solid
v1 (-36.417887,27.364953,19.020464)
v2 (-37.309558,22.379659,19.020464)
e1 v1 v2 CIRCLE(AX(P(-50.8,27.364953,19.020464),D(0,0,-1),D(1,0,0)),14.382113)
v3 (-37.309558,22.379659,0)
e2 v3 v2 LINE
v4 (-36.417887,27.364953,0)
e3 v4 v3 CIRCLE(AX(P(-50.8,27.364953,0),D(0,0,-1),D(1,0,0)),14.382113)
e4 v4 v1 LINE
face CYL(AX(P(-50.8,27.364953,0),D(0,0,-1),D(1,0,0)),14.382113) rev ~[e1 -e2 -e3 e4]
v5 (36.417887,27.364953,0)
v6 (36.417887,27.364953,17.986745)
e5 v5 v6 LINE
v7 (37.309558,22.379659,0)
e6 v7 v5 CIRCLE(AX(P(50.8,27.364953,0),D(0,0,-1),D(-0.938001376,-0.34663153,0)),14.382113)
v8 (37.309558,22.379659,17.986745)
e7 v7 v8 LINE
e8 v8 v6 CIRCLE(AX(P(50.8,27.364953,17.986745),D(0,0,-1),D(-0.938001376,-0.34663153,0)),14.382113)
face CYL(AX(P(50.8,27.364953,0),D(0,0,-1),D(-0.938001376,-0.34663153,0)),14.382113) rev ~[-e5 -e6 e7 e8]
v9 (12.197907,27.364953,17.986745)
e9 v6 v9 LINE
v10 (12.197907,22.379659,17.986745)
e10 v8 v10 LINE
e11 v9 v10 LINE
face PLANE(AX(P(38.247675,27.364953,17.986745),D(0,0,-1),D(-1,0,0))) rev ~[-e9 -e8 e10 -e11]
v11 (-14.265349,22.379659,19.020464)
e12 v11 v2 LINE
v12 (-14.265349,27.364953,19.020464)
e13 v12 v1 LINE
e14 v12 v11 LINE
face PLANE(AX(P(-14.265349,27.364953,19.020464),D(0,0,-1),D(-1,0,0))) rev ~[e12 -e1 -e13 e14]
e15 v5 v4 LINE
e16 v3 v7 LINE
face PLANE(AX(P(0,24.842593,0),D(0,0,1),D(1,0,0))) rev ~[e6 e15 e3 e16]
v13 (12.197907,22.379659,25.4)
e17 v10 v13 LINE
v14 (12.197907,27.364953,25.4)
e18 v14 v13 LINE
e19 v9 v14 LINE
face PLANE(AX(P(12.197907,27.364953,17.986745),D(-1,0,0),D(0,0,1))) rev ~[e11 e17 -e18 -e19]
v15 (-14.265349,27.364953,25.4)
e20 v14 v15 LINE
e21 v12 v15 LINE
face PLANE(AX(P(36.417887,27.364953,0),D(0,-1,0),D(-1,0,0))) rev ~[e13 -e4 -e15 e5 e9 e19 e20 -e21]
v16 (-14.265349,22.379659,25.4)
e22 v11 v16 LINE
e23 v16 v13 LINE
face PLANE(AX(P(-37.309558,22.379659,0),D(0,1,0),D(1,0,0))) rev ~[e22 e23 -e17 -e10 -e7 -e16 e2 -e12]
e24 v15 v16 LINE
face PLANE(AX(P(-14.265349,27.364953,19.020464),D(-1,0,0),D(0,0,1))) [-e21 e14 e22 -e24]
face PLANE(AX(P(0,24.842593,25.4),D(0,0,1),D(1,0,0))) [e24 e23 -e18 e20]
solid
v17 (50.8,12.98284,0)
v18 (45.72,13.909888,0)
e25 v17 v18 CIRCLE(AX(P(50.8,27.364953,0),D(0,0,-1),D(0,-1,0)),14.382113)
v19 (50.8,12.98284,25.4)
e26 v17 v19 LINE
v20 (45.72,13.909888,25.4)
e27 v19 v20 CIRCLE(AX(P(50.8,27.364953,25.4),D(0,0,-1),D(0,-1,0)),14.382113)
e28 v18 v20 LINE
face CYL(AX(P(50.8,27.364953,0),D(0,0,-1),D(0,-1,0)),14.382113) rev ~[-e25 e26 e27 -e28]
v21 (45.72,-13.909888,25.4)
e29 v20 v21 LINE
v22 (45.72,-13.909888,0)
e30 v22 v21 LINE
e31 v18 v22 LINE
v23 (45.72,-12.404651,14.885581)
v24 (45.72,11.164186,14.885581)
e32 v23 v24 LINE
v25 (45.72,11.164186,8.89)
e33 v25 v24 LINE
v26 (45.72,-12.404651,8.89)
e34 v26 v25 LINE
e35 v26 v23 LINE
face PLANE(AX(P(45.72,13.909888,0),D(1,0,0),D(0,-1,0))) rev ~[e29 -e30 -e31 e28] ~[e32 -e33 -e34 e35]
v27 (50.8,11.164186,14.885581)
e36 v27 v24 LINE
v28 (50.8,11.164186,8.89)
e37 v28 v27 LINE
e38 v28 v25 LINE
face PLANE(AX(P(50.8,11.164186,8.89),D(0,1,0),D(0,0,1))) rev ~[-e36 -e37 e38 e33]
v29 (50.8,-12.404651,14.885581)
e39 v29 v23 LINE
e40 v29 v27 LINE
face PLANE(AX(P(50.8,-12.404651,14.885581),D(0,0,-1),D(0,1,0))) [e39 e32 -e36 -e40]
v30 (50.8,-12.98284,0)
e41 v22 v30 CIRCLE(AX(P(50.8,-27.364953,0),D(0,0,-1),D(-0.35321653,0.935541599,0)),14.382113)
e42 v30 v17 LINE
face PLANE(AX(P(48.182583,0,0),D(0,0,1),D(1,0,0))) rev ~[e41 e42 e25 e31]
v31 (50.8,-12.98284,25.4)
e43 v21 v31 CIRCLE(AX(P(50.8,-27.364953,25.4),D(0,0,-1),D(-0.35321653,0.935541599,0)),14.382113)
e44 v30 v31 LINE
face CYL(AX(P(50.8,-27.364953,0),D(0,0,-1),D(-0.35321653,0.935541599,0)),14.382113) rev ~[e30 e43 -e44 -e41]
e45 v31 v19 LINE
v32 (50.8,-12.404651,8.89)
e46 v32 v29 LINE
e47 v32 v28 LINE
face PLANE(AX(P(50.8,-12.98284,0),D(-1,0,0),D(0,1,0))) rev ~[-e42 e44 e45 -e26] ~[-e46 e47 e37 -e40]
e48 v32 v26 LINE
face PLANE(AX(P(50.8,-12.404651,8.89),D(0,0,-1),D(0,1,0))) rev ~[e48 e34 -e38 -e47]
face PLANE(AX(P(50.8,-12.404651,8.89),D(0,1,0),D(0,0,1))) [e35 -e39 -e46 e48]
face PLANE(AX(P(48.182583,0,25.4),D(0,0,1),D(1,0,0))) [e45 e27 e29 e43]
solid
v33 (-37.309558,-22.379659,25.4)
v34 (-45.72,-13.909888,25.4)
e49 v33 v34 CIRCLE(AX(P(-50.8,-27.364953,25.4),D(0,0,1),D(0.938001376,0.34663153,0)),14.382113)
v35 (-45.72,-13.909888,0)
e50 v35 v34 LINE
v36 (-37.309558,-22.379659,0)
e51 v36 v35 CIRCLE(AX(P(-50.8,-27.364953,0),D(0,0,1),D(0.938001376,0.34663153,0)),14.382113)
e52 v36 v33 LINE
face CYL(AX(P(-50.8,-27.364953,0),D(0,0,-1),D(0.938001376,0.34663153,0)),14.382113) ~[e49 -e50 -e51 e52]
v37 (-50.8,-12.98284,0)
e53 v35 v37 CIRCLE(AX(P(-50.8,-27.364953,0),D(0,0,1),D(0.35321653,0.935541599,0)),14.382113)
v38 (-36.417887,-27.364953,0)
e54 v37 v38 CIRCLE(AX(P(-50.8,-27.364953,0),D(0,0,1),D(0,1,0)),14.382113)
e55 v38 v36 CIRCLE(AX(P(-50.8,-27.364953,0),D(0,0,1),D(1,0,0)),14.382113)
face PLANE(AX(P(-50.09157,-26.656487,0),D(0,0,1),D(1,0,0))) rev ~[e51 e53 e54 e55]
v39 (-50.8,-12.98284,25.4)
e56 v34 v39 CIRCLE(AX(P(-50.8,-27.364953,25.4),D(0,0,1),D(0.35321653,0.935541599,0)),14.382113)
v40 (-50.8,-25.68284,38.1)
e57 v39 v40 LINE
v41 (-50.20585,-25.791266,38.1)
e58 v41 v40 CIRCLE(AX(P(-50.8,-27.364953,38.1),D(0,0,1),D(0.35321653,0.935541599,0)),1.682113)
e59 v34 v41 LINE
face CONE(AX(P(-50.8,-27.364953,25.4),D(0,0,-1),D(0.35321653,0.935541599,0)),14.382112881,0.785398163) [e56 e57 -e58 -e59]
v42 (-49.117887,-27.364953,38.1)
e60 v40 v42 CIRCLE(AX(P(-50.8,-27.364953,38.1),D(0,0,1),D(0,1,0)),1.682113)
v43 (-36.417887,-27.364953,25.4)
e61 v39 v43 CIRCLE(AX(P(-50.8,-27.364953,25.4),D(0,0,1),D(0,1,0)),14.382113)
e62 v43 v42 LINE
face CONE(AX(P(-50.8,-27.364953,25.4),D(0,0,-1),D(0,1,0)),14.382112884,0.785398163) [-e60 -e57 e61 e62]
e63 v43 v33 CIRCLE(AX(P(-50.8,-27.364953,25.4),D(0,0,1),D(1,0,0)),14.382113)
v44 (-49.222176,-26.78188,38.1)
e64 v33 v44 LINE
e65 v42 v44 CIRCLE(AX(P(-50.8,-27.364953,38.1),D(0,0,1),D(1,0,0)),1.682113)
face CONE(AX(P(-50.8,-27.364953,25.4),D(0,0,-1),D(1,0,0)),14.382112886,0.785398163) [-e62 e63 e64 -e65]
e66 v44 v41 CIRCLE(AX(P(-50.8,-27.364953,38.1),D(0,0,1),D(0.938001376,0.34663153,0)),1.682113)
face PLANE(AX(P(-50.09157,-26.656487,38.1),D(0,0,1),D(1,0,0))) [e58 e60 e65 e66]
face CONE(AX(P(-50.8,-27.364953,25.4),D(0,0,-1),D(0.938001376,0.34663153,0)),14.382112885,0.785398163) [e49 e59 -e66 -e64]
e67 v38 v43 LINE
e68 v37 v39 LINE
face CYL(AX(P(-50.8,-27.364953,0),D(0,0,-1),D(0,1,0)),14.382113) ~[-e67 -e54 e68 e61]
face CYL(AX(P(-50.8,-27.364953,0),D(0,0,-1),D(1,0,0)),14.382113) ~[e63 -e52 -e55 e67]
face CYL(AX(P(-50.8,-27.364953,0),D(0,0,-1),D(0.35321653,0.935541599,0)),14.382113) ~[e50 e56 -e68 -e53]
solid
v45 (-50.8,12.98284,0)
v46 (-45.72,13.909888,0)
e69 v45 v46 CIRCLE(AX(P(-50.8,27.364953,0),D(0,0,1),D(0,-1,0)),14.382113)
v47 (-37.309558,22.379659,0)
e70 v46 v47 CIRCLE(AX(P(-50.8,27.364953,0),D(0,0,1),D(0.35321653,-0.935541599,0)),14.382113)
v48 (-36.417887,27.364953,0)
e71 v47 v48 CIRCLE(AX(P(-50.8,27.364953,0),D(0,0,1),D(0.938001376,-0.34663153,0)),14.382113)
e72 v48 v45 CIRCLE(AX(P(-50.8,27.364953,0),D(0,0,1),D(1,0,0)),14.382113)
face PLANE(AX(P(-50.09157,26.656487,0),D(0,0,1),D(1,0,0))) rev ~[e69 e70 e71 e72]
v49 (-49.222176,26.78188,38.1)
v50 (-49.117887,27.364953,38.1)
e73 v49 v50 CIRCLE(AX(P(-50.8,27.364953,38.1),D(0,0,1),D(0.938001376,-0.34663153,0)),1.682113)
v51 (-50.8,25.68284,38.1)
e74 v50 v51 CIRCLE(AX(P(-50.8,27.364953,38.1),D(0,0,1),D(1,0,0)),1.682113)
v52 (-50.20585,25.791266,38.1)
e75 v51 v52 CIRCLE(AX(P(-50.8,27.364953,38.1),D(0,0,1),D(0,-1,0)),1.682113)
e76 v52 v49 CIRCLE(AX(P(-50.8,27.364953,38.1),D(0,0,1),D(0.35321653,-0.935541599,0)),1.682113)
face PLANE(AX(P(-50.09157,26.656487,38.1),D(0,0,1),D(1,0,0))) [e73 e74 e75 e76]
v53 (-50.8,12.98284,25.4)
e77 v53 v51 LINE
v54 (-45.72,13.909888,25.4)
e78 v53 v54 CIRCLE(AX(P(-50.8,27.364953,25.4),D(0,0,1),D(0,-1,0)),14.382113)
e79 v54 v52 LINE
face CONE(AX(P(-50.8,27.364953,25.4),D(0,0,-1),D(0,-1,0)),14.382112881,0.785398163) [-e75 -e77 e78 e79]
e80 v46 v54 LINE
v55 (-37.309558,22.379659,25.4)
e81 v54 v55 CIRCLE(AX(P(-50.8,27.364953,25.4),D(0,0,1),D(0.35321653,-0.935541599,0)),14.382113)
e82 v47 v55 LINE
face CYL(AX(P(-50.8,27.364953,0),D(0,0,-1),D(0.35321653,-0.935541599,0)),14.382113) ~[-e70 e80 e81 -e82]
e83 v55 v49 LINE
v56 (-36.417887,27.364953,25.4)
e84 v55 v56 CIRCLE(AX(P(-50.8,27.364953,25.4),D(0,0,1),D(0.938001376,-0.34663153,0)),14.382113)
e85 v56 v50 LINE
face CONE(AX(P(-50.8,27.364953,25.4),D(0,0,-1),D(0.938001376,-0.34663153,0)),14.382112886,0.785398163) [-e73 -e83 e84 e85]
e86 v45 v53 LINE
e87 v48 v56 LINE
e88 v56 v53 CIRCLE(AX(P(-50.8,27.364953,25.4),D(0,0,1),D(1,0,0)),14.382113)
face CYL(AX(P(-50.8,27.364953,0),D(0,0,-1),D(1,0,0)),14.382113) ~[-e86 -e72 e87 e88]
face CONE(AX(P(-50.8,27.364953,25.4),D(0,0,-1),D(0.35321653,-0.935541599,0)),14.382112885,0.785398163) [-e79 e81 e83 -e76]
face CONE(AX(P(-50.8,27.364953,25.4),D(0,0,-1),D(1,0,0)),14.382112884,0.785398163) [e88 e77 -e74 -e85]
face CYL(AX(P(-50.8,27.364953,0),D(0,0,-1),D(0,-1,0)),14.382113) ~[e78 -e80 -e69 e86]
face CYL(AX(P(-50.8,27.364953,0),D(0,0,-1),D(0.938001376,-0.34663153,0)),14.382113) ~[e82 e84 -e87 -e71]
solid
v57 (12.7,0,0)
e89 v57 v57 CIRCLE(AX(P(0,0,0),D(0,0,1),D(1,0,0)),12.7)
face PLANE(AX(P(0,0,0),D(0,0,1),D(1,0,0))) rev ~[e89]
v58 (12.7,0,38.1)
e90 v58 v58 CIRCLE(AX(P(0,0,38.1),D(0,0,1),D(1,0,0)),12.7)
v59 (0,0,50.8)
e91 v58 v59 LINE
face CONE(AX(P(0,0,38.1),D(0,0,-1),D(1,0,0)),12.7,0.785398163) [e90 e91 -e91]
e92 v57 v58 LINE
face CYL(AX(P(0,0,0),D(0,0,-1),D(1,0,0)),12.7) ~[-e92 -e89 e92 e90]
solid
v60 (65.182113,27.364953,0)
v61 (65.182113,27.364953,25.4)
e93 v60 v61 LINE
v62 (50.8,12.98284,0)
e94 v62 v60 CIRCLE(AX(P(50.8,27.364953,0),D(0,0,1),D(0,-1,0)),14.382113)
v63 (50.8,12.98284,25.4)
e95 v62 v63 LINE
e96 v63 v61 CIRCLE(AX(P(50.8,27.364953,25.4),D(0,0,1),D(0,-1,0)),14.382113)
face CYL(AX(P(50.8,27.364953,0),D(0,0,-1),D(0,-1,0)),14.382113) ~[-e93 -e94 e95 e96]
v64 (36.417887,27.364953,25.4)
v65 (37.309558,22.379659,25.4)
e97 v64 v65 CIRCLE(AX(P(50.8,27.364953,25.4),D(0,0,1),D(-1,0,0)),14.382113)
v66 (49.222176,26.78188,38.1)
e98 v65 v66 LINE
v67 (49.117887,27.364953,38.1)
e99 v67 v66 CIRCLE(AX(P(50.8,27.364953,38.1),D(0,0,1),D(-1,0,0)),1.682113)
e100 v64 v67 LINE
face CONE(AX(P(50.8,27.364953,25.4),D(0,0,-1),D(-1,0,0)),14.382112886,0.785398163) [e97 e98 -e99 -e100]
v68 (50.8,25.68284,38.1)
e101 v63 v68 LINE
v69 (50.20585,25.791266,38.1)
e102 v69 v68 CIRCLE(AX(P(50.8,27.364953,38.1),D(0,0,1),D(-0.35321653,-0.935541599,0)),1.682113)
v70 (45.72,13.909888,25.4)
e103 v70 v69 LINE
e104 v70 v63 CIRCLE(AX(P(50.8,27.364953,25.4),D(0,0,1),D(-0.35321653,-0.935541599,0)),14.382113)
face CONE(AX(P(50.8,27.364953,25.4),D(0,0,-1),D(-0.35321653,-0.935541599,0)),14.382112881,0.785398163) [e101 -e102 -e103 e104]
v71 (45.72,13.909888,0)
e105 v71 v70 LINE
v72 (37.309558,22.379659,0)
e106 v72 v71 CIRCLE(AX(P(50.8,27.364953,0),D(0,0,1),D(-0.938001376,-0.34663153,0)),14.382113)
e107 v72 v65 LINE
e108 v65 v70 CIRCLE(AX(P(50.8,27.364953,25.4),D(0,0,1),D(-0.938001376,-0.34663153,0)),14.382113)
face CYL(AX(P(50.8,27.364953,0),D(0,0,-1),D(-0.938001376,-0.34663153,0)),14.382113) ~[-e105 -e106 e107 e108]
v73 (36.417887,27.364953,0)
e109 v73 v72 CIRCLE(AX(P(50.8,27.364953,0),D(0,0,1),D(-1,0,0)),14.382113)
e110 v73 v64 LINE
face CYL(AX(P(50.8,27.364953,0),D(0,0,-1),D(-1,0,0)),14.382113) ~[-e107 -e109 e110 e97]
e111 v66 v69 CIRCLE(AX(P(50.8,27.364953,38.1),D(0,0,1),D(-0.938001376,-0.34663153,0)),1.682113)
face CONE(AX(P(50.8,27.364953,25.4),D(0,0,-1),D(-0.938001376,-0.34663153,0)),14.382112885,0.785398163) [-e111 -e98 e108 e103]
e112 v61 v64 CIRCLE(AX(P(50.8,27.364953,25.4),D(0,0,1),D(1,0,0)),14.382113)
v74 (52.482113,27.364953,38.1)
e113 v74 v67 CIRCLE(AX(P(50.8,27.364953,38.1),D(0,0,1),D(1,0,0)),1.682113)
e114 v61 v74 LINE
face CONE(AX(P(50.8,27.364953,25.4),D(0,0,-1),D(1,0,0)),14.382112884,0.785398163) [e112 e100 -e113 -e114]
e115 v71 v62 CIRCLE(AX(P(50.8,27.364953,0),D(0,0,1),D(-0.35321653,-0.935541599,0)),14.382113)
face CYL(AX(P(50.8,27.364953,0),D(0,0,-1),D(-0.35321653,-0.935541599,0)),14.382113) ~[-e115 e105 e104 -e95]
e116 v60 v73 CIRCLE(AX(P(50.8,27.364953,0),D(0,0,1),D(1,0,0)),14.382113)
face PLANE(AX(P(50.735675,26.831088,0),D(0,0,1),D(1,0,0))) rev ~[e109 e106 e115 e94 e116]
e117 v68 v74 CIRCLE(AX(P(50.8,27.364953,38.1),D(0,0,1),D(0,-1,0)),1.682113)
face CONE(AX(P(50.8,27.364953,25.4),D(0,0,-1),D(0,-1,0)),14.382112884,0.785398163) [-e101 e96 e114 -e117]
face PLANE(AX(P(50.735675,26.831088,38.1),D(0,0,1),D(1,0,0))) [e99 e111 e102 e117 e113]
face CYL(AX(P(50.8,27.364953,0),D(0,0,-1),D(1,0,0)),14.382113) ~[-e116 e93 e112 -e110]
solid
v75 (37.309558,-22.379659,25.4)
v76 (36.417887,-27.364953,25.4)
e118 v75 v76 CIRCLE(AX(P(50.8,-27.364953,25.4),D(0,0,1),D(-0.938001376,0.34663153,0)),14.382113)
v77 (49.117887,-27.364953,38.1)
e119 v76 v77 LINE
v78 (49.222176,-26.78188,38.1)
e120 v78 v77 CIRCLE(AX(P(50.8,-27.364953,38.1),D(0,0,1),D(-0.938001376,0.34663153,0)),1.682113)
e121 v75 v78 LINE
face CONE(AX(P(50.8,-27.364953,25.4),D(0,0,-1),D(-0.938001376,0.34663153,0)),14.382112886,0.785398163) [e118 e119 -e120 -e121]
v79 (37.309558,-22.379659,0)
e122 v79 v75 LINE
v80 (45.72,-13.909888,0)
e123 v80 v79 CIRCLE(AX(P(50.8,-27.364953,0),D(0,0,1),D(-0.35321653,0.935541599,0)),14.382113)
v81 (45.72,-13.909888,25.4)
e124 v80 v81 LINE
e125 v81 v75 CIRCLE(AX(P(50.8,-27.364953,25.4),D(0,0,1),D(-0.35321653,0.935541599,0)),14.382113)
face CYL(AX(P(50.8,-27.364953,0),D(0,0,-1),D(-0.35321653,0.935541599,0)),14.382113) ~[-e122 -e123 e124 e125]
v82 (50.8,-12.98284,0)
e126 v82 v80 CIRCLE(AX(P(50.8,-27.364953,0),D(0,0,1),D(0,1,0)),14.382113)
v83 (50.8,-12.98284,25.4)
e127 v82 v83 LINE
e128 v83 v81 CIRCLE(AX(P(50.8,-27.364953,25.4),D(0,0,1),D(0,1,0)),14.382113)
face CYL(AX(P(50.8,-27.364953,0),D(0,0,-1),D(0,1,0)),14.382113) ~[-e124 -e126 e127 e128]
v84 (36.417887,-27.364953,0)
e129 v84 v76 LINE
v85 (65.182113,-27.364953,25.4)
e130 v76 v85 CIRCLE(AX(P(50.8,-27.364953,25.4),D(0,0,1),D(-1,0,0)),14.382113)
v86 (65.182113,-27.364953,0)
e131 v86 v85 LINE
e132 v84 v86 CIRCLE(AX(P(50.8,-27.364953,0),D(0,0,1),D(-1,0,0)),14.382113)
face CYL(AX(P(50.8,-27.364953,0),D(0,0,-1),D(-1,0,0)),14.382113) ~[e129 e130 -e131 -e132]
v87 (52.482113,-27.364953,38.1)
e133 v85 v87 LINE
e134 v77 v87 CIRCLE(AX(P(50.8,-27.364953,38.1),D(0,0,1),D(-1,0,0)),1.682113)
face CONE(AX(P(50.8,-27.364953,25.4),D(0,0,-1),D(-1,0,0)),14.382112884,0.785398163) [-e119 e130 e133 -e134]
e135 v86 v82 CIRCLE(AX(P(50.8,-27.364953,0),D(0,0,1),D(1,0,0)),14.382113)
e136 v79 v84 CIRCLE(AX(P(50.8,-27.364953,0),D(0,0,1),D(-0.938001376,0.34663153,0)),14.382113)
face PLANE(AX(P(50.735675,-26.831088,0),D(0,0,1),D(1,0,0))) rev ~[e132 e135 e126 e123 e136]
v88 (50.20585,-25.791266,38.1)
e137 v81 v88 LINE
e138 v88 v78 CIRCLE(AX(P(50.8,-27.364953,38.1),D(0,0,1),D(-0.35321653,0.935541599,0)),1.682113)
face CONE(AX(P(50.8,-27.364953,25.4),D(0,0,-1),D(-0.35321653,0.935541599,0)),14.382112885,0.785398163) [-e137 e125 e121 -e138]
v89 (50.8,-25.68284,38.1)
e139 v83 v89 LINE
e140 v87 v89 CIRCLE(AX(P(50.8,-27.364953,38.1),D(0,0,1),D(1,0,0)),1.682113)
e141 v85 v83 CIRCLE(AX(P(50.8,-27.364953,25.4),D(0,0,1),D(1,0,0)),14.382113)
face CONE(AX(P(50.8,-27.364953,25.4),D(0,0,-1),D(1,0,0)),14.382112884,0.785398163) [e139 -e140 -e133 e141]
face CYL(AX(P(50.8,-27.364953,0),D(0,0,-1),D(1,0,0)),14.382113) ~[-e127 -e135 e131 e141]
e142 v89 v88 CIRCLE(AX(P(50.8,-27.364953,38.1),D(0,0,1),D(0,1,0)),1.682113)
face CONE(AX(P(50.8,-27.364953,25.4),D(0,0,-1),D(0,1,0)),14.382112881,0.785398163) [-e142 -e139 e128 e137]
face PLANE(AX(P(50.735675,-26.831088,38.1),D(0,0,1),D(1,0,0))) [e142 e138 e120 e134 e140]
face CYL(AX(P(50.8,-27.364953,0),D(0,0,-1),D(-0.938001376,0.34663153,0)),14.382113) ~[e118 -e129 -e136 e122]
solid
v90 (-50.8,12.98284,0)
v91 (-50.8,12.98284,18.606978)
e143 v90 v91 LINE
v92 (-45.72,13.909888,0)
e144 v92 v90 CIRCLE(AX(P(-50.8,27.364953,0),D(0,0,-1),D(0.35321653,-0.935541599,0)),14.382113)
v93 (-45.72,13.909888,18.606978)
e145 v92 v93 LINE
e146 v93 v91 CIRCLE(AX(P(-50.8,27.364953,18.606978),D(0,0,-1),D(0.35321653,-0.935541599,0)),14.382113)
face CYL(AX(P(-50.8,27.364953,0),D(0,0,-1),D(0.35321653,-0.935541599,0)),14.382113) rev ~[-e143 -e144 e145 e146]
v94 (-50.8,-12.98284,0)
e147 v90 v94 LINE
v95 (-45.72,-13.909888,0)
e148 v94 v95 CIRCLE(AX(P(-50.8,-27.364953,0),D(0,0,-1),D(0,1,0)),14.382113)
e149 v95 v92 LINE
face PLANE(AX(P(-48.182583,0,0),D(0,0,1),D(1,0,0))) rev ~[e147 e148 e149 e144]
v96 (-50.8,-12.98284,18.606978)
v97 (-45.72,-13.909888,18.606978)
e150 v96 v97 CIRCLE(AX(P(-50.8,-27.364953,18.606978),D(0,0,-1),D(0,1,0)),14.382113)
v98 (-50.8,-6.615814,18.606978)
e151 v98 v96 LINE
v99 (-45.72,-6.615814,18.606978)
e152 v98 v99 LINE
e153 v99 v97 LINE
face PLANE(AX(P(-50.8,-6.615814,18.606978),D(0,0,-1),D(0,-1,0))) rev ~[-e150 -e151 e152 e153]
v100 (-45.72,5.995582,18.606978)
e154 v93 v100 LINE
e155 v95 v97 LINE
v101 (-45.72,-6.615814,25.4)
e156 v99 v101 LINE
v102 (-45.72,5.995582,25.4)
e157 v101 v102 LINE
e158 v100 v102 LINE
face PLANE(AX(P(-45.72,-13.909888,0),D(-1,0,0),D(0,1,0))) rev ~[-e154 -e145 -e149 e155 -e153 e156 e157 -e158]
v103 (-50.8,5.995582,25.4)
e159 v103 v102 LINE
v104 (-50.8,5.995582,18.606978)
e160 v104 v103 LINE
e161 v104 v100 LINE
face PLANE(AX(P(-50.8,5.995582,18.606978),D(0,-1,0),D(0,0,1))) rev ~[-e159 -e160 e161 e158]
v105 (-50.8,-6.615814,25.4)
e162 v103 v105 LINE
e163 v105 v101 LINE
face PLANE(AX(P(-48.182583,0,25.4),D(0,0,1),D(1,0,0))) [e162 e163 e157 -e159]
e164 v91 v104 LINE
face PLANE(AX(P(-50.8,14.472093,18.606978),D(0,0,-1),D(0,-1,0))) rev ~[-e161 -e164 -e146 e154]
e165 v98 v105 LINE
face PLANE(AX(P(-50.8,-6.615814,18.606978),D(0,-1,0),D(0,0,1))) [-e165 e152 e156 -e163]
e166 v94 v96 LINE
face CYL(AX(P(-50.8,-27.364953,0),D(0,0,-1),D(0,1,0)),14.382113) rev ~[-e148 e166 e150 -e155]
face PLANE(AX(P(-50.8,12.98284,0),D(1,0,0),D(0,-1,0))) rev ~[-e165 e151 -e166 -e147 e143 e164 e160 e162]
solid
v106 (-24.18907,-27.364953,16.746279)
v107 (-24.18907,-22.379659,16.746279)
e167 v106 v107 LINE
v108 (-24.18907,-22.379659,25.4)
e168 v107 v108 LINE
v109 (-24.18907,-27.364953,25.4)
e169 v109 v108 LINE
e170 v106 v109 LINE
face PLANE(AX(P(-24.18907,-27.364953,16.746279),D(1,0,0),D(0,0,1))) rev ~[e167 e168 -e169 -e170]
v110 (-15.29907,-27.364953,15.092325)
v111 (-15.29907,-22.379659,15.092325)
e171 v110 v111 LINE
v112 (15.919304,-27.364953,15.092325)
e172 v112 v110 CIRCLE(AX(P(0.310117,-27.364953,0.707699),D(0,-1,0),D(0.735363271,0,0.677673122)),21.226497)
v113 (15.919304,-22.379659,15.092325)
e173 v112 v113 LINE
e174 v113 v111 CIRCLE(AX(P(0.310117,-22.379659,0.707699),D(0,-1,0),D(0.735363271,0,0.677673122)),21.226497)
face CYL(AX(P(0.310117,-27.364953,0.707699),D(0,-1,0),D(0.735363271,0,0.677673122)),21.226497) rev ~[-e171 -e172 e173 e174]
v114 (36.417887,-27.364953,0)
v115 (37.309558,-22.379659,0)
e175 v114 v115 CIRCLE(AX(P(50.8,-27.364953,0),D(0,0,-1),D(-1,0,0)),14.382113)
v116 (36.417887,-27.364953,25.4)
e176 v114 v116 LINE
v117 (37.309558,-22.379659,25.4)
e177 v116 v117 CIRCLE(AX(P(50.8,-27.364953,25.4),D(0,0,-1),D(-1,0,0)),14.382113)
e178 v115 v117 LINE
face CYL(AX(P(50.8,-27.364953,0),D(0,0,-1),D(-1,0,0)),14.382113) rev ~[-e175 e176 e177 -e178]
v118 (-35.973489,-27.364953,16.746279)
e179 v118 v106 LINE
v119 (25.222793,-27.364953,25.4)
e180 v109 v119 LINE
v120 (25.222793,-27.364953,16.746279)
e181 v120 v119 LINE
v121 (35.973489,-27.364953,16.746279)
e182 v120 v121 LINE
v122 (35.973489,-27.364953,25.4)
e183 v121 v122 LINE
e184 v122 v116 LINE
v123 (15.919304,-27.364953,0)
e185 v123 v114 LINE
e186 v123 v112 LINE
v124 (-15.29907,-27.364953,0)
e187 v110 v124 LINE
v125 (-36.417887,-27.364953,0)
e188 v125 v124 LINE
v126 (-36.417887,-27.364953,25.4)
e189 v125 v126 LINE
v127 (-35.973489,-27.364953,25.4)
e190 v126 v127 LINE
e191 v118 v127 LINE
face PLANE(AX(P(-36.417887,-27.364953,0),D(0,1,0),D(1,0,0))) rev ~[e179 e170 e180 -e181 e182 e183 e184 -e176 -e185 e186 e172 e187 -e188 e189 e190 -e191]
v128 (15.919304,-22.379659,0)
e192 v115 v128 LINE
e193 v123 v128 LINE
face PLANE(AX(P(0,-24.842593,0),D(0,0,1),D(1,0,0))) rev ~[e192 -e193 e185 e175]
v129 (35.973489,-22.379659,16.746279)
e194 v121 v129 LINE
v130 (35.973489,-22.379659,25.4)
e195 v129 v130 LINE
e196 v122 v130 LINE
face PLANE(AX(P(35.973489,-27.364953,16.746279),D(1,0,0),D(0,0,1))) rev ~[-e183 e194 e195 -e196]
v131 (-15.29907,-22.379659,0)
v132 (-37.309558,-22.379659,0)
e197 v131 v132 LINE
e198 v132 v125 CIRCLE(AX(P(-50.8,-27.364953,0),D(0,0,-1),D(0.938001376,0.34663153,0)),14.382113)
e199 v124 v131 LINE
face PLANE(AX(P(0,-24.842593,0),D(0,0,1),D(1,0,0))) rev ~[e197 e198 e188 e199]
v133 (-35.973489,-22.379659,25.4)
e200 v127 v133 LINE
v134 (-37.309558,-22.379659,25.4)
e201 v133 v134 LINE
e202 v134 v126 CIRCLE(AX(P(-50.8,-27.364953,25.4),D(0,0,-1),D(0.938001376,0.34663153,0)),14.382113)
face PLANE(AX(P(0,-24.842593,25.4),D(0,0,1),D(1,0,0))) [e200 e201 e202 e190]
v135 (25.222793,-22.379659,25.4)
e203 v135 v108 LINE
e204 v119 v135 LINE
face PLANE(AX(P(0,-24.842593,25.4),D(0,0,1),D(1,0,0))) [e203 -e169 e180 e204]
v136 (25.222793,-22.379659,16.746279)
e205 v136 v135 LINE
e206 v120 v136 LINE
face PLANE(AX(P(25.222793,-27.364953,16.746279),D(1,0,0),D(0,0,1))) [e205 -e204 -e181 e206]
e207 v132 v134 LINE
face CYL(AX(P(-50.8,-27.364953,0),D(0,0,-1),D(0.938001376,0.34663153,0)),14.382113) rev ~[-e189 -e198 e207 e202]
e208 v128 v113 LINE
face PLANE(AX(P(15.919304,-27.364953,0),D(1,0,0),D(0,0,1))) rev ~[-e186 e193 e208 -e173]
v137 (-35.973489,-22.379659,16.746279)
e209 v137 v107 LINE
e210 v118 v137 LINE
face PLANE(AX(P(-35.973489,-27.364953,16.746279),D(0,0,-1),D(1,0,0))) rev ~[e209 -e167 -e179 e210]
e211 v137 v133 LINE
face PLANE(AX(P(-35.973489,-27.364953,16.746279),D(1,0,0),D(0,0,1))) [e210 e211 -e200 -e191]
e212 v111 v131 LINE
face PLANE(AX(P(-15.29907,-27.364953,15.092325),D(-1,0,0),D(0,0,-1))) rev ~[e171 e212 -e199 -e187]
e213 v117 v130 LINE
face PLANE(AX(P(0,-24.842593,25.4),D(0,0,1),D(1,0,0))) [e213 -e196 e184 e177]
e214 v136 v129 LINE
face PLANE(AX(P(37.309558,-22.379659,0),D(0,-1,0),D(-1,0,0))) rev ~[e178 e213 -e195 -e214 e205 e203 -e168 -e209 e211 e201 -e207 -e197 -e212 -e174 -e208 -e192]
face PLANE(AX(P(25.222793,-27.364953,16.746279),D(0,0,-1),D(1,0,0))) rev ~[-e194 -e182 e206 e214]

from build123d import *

# Parameters (mm, degrees)
F1_DEPTH   = 25.4
F2_DEPTH   = 38.1
F0_R       = 12.7
F3_DEPTH   = 50.8
F5_DEPTH   = 25.4
F4_W       = 11.7844194174
F4_H       = 8.6537211478
F4_W_2     = 10.750696063
F6_DEPTH   = 25.4
F7_W       = 1.4892533321
F7_H       = 6.7930224627
F7_W_2     = 6.9872582432
F7_W_3     = 6.3670262795
F7_W_4     = 2.1094843645
F8_DEPTH   = 25.4
F9_W       = 23.5688369721
F9_H       = 5.9955809265
F10_DEPTH  = 25.4
F11_W      = 1.8297875876
F11_H      = 7.4132553577
F11_W_2    = 24.2199800333
F11_W_3    = 22.1525379812
F11_H_2    = 6.3795357287
F11_W_4    = 3.6904881353
F12_DEPTH  = 25.4
F13_SIZE   = 12.7
F14_SIZE   = 12.7
F14_2_SIZE = 12.7
F14_3_SIZE = 12.7
F14_4_SIZE = 12.7


with BuildPart() as f1:
    # F0 (on Top) → F1 (new body)
    with BuildSketch(Plane.XY):
        with BuildLine():
            ThreePointArc((37.3095583182, 22.3796591884), (36.6425597983, 24.8327488181), (36.417887116, 27.364952985))
            Line((36.417887116, 27.364952985), (-36.417887116, 27.364952985))
            ThreePointArc((-36.417887116, 27.364952985), (-36.6425597983, 24.8327488181), (-37.3095583182, 22.3796591884))
            Line((-37.3095583182, 22.3796591884), (37.3095583182, 22.3796591884))
        make_face()
    extrude(amount=F1_DEPTH)

    # F11 (on face) → F12 (cut)
    with BuildSketch(Plane(origin=(0, 27.364952985, 0), x_dir=(-1, 0, 0), z_dir=(0, 1, 0))):
        with Locations((-37.3327809098, 21.6933723211)):
            Rectangle(F11_W, F11_H)
        with Locations((-24.3078970994, 21.6933723211)):
            Rectangle(F11_W_2, F11_H)
        with Locations((25.3416181254, 22.2102321357)):
            Rectangle(F11_W_3, F11_H_2)
        with Locations((38.2631311837, 22.2102321357)):
            Rectangle(F11_W_4, F11_H_2)
    extrude(amount=-F12_DEPTH, mode=Mode.SUBTRACT)


with BuildPart() as f1b:
    # F0 (on Top) → F1, piece 2 (new body)
    with BuildSketch(Plane.XY):
        with BuildLine():
            ThreePointArc((-45.72, 13.909888102), (-48.2180521889, 13.2165001894), (-50.8, 12.982840101))
            Line((-50.8, 12.982840101), (-50.8, -12.982840101))
            ThreePointArc((-50.8, -12.982840101), (-48.2180521889, -13.2165001894), (-45.72, -13.909888102))
            Line((-45.72, -13.909888102), (-45.72, 13.909888102))
        make_face()
    extrude(amount=F1_DEPTH)

    # F7 (on face) → F8 (cut)
    with BuildSketch(Plane(origin=(-50.8, 0, 0), x_dir=(0, -1, 0), z_dir=(-1, 0, 0))):
        with Locations((-13.7274667671, 22.0034887686)):
            Rectangle(F7_W, F7_H)
        with Locations((-9.4892109794, 22.0034887686)):
            Rectangle(F7_W_2, F7_H)
        with Locations((9.7993269613, 22.0034887686)):
            Rectangle(F7_W_3, F7_H)
        with Locations((14.0375822833, 22.0034887686)):
            Rectangle(F7_W_4, F7_H)
    extrude(amount=-F8_DEPTH, mode=Mode.SUBTRACT)


with BuildPart() as f1c:
    # F0 (on Top) → F1, piece 3 (new body)
    with BuildSketch(Plane.XY):
        with BuildLine():
            Line((50.8, -12.982840101), (50.8, 12.982840101))
            ThreePointArc((50.8, 12.982840101), (48.2180521889, 13.2165001894), (45.72, 13.909888102))
            Line((45.72, 13.909888102), (45.72, -13.909888102))
            ThreePointArc((45.72, -13.909888102), (48.2180521889, -13.2165001894), (50.8, -12.982840101))
        make_face()
    extrude(amount=F1_DEPTH)

    # F9 (on face) → F10 (cut)
    with BuildSketch(Plane.YZ.offset(50.8)):
        with Locations((-0.620232895, 11.8877906352)):
            Rectangle(F9_W, F9_H)
    extrude(amount=-F10_DEPTH, mode=Mode.SUBTRACT)


with BuildPart() as f1d:
    # F0 (on Top) → F1, piece 4 (new body)
    with BuildSketch(Plane.XY):
        with BuildLine():
            ThreePointArc((-37.3095583182, -22.3796591884), (-36.6425597983, -24.8327488181), (-36.417887116, -27.364952985))
            Line((-36.417887116, -27.364952985), (36.417887116, -27.364952985))
            ThreePointArc((36.417887116, -27.364952985), (36.6425597983, -24.8327488181), (37.3095583182, -22.3796591884))
            Line((37.3095583182, -22.3796591884), (-37.3095583182, -22.3796591884))
        make_face()
    extrude(amount=F1_DEPTH)

    # F4 (on face) → F5 (cut)
    with BuildSketch(Plane.XZ.offset(27.364952985)):
        with BuildLine():
            Line((-15.2990696952, 15.0923253968), (-15.2990696952, 0))
            Line((-15.2990696952, 0), (15.9193035215, 0))
            Line((15.9193035215, 0), (15.9193035215, 15.0923253968))
            ThreePointArc((15.9193035215, 15.0923253968), (0.3101169132, 21.9341960604), (-15.2990696952, 15.0923253968))
        make_face()
    extrude(amount=-F5_DEPTH, mode=Mode.SUBTRACT)

    # F4 (on face) → F6 (cut)
    with BuildSketch(Plane.XZ.offset(27.364952985)):
        with Locations((-30.0812795758, 21.0731394261)):
            Rectangle(F4_W, F4_H)
        with Locations((30.598141253, 21.0731394261)):
            Rectangle(F4_W_2, F4_H)
    extrude(amount=-F6_DEPTH, mode=Mode.SUBTRACT)


with BuildPart() as f2:
    # F0 (on Top) → F2 (new body)
    with BuildSketch(Plane.XY):
        with BuildLine():
            ThreePointArc((-37.3095583182, 22.3796591884), (-36.6425597983, 24.8327488181), (-36.417887116, 27.364952985))
            ThreePointArc((-36.417887116, 27.364952985), (-60.969689548, 37.534642533), (-50.8, 12.982840101))
            ThreePointArc((-50.8, 12.982840101), (-48.2180521889, 13.2165001894), (-45.72, 13.909888102))
            ThreePointArc((-45.72, 13.909888102), (-40.5946297653, 17.2310697521), (-37.3095583182, 22.3796591884))
        make_face()
    extrude(amount=F2_DEPTH)

    # F14
    f14_edges = [f2.edges().sort_by_distance(p)[0] for p in [
        (-50.8, 41.747066, 38.1),
    ]]
    chamfer(f14_edges, length=F14_SIZE)


with BuildPart() as f2b:
    # F0 (on Top) → F2, piece 2 (new body)
    with BuildSketch(Plane.XY):
        with BuildLine():
            ThreePointArc((65.182112884, 27.364952985), (50.8, 41.747065869), (36.417887116, 27.364952985))
            ThreePointArc((36.417887116, 27.364952985), (36.6425597983, 24.8327488181), (37.3095583182, 22.3796591884))
            ThreePointArc((37.3095583182, 22.3796591884), (40.5946297653, 17.2310697521), (45.72, 13.909888102))
            ThreePointArc((45.72, 13.909888102), (48.2180521889, 13.2165001894), (50.8, 12.982840101))
            ThreePointArc((50.8, 12.982840101), (60.969689548, 17.195263437), (65.182112884, 27.364952985))
        make_face()
    extrude(amount=F2_DEPTH)

    # F14#2
    f14_2_edges = [f2b.edges().sort_by_distance(p)[0] for p in [
        (65.182113, 27.364953, 38.1),
    ]]
    chamfer(f14_2_edges, length=F14_2_SIZE)


with BuildPart() as f2c:
    # F0 (on Top) → F2, piece 3 (new body)
    with BuildSketch(Plane.XY):
        with BuildLine():
            ThreePointArc((65.182112884, -27.364952985), (60.969689548, -17.195263437), (50.8, -12.982840101))
            ThreePointArc((50.8, -12.982840101), (48.2180521889, -13.2165001894), (45.72, -13.909888102))
            ThreePointArc((45.72, -13.909888102), (40.5946297653, -17.2310697521), (37.3095583182, -22.3796591884))
            ThreePointArc((37.3095583182, -22.3796591884), (36.6425597983, -24.8327488181), (36.417887116, -27.364952985))
            ThreePointArc((36.417887116, -27.364952985), (50.8, -41.747065869), (65.182112884, -27.364952985))
        make_face()
    extrude(amount=F2_DEPTH)

    # F14#3
    f14_3_edges = [f2c.edges().sort_by_distance(p)[0] for p in [
        (36.417887, -27.364953, 38.1),
    ]]
    chamfer(f14_3_edges, length=F14_3_SIZE)


with BuildPart() as f2d:
    # F0 (on Top) → F2, piece 4 (new body)
    with BuildSketch(Plane.XY):
        with BuildLine():
            ThreePointArc((-45.72, -13.909888102), (-48.2180521889, -13.2165001894), (-50.8, -12.982840101))
            ThreePointArc((-50.8, -12.982840101), (-60.969689548, -37.534642533), (-36.417887116, -27.364952985))
            ThreePointArc((-36.417887116, -27.364952985), (-36.6425597983, -24.8327488181), (-37.3095583182, -22.3796591884))
            ThreePointArc((-37.3095583182, -22.3796591884), (-40.5946297653, -17.2310697521), (-45.72, -13.909888102))
        make_face()
    extrude(amount=F2_DEPTH)

    # F14#4
    f14_4_edges = [f2d.edges().sort_by_distance(p)[0] for p in [
        (-65.182113, -27.364953, 38.1),
    ]]
    chamfer(f14_4_edges, length=F14_4_SIZE)


with BuildPart() as f3:
    # F0 (on Top) → F3 (new body)
    with BuildSketch(Plane.XY):
        Circle(F0_R)
    extrude(amount=F3_DEPTH)

    # F13
    f13_edges = [f3.edges().sort_by_distance(p)[0] for p in [
        (-12.7, 0, 50.8),
    ]]
    chamfer(f13_edges, length=F13_SIZE)


solid = Compound([f1.part, f1b.part, f1c.part, f1d.part, f2.part, f2b.part, f2c.part, f2d.part, f3.part])
